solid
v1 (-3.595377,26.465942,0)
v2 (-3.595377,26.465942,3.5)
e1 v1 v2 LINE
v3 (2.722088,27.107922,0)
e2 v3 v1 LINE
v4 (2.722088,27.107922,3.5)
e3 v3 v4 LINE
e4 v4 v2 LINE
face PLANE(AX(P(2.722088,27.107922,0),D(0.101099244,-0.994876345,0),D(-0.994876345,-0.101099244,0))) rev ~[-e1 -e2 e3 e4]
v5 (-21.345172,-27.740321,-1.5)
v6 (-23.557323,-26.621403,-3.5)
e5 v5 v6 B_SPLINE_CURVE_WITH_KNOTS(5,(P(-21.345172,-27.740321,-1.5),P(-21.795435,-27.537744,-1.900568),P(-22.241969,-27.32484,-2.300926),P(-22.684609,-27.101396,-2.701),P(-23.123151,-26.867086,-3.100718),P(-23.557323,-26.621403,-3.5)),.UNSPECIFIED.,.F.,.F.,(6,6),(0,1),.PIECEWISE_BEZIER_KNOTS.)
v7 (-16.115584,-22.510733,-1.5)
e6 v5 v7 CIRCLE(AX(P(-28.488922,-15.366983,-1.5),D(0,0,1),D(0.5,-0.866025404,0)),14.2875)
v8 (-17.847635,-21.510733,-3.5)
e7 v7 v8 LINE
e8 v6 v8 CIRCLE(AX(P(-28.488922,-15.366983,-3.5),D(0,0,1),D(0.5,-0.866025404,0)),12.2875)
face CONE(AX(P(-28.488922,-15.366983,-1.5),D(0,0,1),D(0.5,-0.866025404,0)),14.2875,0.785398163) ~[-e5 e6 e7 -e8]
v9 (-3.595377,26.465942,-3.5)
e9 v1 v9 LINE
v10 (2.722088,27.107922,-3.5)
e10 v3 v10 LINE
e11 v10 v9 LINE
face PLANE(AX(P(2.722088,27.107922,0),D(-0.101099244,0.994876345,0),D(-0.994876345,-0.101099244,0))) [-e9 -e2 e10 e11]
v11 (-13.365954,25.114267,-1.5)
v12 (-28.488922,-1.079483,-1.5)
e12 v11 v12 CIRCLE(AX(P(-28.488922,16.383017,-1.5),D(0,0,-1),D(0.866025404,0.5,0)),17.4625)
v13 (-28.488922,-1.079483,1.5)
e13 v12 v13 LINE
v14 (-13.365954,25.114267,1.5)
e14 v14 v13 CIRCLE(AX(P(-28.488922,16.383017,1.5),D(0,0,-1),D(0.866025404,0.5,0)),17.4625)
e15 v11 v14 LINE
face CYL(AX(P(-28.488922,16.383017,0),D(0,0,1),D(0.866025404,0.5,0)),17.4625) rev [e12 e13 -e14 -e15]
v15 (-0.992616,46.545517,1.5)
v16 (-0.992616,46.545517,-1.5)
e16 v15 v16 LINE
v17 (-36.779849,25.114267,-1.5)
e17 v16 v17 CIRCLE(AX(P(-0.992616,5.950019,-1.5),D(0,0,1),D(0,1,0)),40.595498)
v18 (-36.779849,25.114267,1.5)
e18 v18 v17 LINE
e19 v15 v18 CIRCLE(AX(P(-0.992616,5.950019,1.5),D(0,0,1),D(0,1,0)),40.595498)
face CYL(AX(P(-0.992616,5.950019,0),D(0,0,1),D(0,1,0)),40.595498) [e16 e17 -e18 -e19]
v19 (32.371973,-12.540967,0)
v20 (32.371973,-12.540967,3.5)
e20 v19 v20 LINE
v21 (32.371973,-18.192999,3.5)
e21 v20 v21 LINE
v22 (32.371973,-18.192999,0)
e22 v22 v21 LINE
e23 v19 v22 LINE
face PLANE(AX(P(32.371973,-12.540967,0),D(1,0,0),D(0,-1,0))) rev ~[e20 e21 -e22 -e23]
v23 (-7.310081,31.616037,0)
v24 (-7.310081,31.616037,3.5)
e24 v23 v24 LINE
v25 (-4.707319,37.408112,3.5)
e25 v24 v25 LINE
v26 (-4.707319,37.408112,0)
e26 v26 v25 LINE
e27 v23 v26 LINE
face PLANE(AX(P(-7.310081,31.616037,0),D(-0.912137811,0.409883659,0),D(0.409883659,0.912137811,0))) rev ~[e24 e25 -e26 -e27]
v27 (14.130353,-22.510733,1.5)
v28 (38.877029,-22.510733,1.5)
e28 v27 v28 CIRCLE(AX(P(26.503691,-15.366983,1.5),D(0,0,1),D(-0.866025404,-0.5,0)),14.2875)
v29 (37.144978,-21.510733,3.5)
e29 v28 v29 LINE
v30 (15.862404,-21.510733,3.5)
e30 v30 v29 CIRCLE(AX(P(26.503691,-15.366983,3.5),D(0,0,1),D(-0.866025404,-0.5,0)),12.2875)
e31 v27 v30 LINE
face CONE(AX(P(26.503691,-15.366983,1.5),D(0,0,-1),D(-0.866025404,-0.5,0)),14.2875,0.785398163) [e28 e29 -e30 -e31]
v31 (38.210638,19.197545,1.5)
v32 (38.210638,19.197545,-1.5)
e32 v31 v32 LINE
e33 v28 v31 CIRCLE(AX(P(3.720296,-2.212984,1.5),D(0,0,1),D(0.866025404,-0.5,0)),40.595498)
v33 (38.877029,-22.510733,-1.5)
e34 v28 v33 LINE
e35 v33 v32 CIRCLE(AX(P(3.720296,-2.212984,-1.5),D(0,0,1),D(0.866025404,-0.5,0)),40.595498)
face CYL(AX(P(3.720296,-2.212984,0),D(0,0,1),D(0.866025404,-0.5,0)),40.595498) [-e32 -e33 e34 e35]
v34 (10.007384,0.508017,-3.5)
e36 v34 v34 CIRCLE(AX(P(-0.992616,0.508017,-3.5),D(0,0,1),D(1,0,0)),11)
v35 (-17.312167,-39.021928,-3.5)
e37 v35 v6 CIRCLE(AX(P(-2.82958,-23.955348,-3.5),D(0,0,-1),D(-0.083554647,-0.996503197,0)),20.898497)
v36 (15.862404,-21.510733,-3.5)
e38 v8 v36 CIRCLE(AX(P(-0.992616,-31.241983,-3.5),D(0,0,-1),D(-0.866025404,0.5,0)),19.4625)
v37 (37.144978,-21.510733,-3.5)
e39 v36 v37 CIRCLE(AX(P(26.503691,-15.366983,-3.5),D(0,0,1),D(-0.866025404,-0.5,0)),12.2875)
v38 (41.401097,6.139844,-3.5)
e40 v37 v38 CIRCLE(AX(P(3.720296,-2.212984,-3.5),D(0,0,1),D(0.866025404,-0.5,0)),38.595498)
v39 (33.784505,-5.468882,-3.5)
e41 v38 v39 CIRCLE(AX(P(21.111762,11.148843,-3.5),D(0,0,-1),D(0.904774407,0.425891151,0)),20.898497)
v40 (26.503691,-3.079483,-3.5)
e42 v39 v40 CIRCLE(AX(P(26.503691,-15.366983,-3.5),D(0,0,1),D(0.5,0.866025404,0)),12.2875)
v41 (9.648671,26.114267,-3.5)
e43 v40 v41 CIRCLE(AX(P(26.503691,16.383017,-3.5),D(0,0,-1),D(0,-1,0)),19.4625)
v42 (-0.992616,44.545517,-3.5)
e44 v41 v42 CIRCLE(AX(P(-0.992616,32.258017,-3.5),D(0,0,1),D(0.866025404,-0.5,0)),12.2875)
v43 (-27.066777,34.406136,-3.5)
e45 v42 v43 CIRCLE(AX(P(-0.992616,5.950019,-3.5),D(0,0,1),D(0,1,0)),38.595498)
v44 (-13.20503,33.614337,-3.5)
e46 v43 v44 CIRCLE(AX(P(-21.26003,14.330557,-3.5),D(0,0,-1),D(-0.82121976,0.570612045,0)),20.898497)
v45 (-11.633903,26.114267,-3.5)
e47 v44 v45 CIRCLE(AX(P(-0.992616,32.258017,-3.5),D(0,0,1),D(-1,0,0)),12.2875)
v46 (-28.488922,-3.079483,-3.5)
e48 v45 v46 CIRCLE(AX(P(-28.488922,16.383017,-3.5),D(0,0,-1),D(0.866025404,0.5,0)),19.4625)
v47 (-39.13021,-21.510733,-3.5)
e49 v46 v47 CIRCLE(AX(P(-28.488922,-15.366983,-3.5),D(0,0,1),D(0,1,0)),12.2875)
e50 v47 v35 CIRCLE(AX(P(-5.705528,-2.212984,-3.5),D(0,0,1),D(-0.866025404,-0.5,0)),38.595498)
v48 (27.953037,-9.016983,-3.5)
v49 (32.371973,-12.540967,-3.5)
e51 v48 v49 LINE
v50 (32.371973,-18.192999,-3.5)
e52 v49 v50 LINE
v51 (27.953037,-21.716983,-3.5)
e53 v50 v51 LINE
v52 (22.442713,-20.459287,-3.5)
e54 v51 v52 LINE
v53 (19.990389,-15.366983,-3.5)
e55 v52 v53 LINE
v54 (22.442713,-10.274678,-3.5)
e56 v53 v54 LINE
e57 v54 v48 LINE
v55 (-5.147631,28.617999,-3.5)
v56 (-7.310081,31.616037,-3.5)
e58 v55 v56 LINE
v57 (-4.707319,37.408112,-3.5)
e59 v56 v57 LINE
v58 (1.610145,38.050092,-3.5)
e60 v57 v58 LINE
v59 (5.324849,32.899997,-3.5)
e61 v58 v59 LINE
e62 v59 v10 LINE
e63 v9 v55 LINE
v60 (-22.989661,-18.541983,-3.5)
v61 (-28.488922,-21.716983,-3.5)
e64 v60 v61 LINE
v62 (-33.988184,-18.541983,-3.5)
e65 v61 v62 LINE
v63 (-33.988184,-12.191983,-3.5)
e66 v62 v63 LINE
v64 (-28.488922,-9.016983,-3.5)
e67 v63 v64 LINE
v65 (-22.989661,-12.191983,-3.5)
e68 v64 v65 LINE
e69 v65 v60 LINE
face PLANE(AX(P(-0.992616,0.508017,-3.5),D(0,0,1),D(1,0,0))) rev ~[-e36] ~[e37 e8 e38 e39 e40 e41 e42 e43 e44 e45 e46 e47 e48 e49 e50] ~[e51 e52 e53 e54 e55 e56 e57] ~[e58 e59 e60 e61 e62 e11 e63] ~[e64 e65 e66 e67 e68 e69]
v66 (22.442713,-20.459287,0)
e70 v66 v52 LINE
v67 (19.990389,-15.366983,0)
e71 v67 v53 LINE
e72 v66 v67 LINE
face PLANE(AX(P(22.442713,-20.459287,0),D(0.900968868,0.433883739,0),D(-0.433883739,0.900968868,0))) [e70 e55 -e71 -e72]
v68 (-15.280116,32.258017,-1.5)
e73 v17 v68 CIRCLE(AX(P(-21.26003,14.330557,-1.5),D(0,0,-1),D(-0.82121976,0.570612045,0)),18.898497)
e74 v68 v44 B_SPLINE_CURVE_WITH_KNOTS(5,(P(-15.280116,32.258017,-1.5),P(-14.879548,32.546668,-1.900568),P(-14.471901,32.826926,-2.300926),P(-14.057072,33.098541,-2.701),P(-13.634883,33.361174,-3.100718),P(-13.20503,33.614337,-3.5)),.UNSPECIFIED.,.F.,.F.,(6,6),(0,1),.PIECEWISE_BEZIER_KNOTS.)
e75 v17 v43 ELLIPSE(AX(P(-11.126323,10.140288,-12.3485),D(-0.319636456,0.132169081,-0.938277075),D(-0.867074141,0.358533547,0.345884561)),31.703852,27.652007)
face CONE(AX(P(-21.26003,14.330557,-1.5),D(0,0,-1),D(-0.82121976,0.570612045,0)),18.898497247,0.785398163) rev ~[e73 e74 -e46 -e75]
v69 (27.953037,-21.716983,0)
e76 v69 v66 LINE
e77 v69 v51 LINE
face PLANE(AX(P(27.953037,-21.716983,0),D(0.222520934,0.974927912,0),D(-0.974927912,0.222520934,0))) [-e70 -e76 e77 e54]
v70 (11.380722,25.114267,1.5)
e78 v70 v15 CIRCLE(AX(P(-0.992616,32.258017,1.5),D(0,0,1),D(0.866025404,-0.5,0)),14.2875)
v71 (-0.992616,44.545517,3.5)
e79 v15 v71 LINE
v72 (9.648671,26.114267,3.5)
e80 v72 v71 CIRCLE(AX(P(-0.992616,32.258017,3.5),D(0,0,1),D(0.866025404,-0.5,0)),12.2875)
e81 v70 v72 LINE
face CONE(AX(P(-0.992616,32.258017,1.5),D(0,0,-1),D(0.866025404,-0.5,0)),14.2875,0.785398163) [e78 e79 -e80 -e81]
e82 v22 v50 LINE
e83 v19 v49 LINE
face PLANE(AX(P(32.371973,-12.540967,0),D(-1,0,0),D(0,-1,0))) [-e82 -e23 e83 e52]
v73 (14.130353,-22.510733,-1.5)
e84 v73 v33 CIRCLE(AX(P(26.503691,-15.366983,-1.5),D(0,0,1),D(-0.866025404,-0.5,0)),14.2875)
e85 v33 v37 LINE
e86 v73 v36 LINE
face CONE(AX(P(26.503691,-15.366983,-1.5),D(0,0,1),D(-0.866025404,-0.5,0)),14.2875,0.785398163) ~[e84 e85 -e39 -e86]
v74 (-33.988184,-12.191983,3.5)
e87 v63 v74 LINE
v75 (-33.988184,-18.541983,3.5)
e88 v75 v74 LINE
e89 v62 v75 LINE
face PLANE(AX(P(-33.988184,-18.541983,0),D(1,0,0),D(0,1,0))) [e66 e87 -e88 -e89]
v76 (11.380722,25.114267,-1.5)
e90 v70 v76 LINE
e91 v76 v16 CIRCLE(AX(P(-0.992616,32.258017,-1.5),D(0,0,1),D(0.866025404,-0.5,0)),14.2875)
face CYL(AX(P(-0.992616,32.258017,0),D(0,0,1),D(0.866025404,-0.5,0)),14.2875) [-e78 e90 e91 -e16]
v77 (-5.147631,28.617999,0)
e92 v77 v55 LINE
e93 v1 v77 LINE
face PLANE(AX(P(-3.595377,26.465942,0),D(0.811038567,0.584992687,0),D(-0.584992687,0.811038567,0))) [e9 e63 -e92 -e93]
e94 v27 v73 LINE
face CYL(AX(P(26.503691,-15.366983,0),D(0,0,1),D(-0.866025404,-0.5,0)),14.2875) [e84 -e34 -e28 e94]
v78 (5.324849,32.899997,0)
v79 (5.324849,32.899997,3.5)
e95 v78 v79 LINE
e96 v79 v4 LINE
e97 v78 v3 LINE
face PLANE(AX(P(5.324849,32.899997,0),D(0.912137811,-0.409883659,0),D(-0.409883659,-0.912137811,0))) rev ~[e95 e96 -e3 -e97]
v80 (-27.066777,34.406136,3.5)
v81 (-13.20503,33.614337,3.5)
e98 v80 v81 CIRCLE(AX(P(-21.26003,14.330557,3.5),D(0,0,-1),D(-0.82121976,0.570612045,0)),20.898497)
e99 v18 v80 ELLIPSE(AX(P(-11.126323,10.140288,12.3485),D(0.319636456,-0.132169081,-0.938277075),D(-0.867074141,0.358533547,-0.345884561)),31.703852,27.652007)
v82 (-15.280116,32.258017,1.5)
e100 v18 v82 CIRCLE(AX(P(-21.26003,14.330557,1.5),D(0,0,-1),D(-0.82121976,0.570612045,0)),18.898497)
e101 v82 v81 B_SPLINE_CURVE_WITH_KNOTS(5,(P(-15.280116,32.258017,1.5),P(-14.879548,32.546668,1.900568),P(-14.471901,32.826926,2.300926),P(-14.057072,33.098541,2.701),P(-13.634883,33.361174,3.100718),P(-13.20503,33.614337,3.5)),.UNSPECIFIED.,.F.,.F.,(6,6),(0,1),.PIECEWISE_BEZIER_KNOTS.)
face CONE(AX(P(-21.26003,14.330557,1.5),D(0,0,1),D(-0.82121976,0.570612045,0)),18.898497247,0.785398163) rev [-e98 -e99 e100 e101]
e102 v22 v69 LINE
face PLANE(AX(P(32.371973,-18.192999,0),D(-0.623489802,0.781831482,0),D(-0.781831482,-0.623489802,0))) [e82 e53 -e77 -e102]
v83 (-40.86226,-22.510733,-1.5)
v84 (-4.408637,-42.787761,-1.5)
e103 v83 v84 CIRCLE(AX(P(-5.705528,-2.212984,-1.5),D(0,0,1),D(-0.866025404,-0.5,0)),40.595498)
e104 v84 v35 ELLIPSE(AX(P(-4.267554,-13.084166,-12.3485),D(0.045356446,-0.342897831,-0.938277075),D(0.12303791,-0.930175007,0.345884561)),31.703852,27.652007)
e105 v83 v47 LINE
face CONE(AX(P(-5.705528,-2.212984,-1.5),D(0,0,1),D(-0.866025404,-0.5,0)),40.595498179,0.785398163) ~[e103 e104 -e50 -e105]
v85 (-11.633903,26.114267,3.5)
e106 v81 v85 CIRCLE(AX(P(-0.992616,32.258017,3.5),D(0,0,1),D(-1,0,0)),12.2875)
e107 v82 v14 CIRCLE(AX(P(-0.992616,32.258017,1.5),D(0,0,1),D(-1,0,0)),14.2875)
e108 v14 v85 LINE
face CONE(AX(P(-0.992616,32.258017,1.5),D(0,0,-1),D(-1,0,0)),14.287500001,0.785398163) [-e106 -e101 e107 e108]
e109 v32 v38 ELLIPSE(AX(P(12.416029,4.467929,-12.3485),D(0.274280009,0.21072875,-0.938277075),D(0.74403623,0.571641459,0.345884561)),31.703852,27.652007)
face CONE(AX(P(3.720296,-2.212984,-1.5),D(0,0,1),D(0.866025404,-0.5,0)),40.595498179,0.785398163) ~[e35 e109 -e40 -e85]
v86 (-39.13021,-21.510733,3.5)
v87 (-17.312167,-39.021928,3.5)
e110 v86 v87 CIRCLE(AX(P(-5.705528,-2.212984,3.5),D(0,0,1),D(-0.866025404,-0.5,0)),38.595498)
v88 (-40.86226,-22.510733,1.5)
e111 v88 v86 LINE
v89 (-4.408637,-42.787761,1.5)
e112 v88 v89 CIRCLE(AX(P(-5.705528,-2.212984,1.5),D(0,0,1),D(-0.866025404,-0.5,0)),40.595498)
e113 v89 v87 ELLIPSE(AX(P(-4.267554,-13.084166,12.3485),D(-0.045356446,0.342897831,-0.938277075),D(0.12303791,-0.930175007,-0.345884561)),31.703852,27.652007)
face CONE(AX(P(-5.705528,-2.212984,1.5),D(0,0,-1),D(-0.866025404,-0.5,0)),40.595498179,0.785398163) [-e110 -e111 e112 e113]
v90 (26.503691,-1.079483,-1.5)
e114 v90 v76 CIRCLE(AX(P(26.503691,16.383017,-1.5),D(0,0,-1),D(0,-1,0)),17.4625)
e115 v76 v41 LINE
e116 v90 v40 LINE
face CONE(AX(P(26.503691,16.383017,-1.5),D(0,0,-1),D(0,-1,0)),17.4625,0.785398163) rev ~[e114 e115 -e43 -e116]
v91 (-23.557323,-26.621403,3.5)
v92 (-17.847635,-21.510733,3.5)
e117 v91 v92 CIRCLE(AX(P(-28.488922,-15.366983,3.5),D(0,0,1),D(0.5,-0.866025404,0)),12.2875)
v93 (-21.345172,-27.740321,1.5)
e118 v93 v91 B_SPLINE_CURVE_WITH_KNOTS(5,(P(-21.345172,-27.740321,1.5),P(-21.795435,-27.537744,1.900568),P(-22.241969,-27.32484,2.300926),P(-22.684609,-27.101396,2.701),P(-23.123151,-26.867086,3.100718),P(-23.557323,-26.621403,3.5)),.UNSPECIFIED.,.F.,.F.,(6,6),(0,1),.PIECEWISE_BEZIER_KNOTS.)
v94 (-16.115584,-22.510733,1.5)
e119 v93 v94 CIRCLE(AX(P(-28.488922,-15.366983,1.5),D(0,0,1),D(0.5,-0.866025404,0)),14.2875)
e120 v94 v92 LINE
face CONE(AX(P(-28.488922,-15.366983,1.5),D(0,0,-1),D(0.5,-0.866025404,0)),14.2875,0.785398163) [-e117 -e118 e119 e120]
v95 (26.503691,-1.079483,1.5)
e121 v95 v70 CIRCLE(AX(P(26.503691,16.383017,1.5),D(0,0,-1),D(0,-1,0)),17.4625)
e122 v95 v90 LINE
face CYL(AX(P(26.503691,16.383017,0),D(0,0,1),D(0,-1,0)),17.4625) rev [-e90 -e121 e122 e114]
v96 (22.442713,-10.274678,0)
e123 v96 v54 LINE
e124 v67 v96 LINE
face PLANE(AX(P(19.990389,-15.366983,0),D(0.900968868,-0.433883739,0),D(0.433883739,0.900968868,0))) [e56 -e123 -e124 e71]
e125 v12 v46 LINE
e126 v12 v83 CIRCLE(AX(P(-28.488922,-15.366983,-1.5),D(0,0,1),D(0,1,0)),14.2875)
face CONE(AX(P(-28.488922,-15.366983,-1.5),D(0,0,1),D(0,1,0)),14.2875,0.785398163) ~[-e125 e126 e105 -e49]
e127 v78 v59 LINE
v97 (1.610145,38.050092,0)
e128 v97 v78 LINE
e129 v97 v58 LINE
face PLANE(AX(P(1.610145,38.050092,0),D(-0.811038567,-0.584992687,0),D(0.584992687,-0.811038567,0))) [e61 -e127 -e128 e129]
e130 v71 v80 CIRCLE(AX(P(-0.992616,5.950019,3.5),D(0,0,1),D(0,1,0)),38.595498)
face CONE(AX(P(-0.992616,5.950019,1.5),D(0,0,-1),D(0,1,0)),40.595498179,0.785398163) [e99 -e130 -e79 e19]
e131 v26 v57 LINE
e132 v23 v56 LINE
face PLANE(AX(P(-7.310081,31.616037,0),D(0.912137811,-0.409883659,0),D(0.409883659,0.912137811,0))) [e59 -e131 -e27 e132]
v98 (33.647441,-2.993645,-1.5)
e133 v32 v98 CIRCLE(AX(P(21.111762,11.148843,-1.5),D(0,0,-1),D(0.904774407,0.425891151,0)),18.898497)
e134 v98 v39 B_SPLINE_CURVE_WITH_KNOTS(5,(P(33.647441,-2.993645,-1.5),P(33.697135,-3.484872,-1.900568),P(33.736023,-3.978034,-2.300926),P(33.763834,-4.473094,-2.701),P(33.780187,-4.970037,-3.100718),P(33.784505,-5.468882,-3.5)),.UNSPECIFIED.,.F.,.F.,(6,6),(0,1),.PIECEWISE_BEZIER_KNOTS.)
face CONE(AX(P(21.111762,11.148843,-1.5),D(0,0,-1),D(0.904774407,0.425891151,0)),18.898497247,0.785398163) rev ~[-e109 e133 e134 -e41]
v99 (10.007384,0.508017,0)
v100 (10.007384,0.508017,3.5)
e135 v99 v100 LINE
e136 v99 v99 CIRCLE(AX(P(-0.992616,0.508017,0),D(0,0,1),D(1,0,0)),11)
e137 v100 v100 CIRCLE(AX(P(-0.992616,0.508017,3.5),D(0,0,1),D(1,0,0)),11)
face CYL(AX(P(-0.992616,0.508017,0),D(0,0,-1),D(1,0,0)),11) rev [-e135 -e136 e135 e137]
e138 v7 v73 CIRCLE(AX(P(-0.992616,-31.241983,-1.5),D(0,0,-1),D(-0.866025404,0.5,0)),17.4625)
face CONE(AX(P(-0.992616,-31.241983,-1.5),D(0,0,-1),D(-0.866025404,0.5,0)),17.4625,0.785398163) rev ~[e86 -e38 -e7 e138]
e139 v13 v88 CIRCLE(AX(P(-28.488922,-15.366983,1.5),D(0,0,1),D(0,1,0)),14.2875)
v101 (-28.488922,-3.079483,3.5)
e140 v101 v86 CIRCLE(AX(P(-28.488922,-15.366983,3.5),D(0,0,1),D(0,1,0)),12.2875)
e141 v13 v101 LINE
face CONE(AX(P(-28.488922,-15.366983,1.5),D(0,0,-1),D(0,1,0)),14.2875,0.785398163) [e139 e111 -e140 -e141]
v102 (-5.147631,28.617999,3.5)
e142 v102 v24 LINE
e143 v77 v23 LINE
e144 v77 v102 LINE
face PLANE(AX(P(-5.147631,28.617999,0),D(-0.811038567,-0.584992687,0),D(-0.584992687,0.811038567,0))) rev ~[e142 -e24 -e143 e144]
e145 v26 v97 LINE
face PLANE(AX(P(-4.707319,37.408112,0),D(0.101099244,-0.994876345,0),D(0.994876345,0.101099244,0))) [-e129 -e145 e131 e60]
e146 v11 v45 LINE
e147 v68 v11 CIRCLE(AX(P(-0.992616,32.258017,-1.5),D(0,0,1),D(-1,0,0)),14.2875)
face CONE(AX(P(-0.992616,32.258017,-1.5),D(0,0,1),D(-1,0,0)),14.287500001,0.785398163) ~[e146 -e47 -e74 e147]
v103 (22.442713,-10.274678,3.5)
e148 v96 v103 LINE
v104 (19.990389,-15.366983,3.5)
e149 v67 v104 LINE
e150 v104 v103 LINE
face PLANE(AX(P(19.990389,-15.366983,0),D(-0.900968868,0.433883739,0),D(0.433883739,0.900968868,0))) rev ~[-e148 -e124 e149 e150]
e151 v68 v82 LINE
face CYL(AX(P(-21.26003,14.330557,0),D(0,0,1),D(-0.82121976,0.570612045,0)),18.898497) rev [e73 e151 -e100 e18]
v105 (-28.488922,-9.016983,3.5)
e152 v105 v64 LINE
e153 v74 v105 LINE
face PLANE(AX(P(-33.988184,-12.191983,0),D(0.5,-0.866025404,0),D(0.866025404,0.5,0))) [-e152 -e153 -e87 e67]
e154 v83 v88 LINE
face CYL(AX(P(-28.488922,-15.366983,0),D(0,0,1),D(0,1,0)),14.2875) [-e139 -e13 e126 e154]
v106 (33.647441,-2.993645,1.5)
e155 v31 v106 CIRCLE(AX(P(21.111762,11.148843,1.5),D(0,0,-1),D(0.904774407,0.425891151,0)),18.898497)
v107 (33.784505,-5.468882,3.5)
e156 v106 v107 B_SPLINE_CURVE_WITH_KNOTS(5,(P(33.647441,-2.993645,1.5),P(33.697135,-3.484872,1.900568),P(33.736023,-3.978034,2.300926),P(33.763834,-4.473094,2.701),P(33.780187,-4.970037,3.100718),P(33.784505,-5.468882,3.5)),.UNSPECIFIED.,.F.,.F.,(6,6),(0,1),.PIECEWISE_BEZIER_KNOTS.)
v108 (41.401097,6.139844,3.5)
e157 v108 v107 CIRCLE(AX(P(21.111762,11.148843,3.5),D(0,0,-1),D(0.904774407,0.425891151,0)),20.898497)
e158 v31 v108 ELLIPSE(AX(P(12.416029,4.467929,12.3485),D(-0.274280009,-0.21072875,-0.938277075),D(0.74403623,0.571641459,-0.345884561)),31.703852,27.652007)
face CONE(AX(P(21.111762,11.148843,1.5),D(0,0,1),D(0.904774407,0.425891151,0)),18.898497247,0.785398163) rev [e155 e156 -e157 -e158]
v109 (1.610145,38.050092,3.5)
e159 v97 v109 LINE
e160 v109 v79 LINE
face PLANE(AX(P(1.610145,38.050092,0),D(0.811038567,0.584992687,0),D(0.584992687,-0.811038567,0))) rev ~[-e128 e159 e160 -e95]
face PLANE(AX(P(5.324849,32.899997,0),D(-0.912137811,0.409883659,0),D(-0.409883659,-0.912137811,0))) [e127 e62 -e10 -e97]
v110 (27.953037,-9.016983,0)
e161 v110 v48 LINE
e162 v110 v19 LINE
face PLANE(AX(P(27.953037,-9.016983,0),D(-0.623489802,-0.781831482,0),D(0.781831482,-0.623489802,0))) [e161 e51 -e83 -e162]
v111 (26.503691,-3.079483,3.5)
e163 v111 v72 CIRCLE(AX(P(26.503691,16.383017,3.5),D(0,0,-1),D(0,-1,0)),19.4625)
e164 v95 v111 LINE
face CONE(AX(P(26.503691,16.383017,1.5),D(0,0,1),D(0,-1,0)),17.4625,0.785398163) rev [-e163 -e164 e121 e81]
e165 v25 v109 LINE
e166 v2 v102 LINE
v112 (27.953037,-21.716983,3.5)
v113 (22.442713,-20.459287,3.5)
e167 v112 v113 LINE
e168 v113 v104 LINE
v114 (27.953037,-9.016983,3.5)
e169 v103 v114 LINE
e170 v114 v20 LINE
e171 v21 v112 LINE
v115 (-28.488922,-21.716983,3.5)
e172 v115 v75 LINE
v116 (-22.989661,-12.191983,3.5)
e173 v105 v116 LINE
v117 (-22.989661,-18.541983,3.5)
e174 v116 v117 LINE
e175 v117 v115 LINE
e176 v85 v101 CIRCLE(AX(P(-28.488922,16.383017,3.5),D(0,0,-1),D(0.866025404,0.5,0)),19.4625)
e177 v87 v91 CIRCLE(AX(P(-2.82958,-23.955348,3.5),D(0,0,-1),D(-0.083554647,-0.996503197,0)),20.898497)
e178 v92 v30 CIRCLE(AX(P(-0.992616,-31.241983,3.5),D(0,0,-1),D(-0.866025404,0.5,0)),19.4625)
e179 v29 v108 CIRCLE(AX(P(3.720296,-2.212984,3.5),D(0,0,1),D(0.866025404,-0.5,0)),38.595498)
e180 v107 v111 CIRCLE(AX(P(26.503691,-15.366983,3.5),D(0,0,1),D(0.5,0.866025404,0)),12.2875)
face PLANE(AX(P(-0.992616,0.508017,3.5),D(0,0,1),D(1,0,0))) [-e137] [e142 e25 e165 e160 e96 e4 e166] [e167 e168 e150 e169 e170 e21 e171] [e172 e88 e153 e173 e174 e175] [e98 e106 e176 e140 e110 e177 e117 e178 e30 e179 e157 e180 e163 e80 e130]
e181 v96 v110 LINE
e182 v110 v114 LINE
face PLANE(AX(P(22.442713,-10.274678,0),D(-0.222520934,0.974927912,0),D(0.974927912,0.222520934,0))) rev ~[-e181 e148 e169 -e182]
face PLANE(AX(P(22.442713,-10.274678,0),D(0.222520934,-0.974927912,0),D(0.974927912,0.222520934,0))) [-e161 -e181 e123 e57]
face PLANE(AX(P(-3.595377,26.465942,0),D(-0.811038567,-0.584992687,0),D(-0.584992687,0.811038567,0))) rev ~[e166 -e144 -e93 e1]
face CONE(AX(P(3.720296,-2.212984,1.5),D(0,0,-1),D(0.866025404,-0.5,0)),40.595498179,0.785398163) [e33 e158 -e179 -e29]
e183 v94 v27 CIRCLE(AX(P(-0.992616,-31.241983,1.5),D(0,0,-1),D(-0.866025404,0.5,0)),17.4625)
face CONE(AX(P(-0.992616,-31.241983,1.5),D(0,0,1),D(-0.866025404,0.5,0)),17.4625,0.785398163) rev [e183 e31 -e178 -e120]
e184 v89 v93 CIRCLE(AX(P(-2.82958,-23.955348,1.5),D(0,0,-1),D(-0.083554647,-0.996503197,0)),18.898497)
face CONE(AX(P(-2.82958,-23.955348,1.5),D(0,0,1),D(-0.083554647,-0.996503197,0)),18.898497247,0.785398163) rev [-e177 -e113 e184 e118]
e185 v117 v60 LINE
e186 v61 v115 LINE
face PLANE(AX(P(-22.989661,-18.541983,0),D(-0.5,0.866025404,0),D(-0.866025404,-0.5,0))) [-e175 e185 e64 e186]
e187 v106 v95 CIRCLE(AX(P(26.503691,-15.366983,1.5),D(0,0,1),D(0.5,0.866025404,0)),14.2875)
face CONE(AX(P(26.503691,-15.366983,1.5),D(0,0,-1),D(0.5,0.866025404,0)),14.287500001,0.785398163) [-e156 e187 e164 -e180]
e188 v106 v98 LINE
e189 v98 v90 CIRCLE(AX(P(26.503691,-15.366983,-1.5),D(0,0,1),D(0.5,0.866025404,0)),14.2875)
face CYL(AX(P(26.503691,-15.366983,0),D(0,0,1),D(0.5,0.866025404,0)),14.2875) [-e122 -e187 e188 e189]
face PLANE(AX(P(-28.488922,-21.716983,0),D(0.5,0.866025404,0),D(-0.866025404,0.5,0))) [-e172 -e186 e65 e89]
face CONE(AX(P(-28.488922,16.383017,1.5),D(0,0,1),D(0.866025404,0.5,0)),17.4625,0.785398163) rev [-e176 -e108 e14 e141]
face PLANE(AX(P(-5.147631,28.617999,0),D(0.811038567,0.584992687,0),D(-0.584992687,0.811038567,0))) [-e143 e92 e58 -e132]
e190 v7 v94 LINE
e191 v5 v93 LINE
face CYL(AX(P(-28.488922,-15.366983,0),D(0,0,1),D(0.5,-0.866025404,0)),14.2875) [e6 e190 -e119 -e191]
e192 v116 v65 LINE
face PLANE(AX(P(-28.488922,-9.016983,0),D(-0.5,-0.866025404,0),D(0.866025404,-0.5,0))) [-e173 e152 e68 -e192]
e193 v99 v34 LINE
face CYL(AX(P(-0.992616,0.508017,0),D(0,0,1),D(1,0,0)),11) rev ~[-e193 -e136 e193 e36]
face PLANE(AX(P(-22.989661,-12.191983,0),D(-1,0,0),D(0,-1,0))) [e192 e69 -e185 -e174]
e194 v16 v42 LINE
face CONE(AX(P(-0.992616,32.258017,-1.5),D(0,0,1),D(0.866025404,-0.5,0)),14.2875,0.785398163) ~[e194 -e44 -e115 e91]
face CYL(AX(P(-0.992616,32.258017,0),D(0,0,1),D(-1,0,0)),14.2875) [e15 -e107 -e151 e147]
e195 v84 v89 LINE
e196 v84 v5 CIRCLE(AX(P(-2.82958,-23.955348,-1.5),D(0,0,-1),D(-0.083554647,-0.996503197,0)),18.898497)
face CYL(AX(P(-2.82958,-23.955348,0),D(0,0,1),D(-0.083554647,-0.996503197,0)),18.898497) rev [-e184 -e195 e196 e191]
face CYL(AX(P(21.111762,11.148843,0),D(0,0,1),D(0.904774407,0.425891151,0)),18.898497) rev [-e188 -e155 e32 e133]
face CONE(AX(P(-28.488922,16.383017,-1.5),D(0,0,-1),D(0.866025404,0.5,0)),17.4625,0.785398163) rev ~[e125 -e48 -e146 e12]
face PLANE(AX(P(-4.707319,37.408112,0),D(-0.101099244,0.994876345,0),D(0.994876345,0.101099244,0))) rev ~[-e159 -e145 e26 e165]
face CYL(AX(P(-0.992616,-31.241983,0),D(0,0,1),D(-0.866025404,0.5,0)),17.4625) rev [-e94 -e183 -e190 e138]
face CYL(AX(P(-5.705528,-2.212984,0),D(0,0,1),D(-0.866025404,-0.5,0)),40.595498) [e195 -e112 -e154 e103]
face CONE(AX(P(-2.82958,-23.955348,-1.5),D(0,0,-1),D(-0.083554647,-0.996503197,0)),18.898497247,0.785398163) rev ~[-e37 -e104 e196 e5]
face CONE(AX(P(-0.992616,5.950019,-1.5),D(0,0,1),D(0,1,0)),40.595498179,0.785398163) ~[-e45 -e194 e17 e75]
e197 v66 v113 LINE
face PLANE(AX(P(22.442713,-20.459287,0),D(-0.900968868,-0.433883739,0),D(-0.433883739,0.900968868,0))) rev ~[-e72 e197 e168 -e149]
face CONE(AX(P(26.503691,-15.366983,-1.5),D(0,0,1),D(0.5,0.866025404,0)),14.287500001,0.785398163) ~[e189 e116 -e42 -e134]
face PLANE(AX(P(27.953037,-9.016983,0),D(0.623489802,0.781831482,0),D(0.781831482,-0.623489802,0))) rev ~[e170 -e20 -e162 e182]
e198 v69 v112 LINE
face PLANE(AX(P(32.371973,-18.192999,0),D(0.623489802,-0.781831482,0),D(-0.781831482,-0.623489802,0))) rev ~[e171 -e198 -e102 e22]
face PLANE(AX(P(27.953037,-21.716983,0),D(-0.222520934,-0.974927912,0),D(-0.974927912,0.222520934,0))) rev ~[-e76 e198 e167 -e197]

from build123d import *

# Parameters (mm, degrees)
F0_R          = 11
F1_DEPTH      = 3.5
F1_DEPTH_BACK = 3.5
F2_SIZE       = 2


# Not quite as in the source:
# - a feature names something its author has since deleted; it is built from what else it names


with BuildPart() as f1:
    # F0 (on Top) → F1 (new body, two sides)
    with BuildSketch(Plane.XY) as f1_sk:
        with BuildLine():
            ThreePointArc((-36.7798490863, 25.1142671396), (-27.219118588, 32.264950132), (-15.2801158302, 32.2580171396))
            ThreePointArc((-15.2801158302, 32.2580171396), (-14.7932810733, 28.5601400327), (-13.3659537868, 25.1142671396))
            ThreePointArc((-13.3659537868, 25.1142671396), (-13.3659537868, 7.6517671396), (-28.4889224003, -1.0794828604))
            ThreePointArc((-28.4889224003, -1.0794828604), (-40.8622603569, -8.2232328604), (-40.8622603569, -22.5107328604))
            ThreePointArc((-40.8622603569, -22.5107328604), (-25.4390445698, -37.6894940637), (-4.408636794, -42.7877609913))
            ThreePointArc((-4.408636794, -42.7877609913), (-15.3816751689, -38.0832669973), (-21.3451724003, -27.740320817))
            ThreePointArc((-21.3451724003, -27.740320817), (-18.3861342641, -25.4697709966), (-16.1155844438, -22.5107328604))
            ThreePointArc((-16.1155844438, -22.5107328604), (-0.9926158302, -13.7794828604), (14.1303527834, -22.5107328604))
            ThreePointArc((14.1303527834, -22.5107328604), (26.50369074, -29.6544828604), (38.8770286965, -22.5107328604))
            ThreePointArc((38.8770286965, -22.5107328604), (44.310613603, -1.5644555791), (38.2106383897, 19.1975452705))
            ThreePointArc((38.2106383897, 19.1975452705), (39.6229462664, 7.3423682841), (33.64744074, -2.9936449038))
            ThreePointArc((33.64744074, -2.9936449038), (30.2015678469, -1.5663176173), (26.50369074, -1.0794828604))
            ThreePointArc((26.50369074, -1.0794828604), (11.3807221264, 7.6517671396), (11.3807221264, 25.1142671396))
            ThreePointArc((11.3807221264, 25.1142671396), (11.3807221264, 39.4017671396), (-0.9926158302, 46.5455171396))
            ThreePointArc((-0.9926158302, 46.5455171396), (-21.8494165238, 40.7780010616), (-36.7798490863, 25.1142671396))
        make_face()
        Polygon((-28.4889224003, -21.7169828604), (-33.9881837144, -18.5419828604), (-33.9881837144, -12.1919828604), (-28.4889224003, -9.0169828604), (-22.9896610863, -12.1919828604), (-22.9896610863, -18.5419828604), align=None, mode=Mode.SUBTRACT)
        with Locations((-0.9926158302, 0.5080171396)):
            Circle(F0_R, mode=Mode.SUBTRACT)
        Polygon((27.9530368024, -9.0169828604), (32.3719731429, -12.5409669992), (32.3719731429, -18.1929987216), (27.9530368024, -21.7169828604), (22.4427133156, -20.4592874828), (19.9903886582, -15.3669828604), (22.4427133156, -10.274678238), align=None, mode=Mode.SUBTRACT)
        Polygon((5.3248489637, 32.8999973403), (2.7220877293, 27.1079222409), (-3.5953770646, 26.4659420402), (-5.1476309604, 28.6179993288), (-7.3100806241, 31.6160369389), (-4.7073193896, 37.4081120383), (1.6101454042, 38.050092239), align=None, mode=Mode.SUBTRACT)
    extrude(amount=F1_DEPTH)
    extrude(f1_sk.sketch, amount=-F1_DEPTH_BACK)

    # F2
    f2_edges = [f1.edges().sort_by_distance(p)[0] for p in [
        (-25.439045, -37.689494, 3.5),
        (-25.439045, -37.689494, -3.5),
        (-21.849417, 40.778001, -3.5),
        (-21.849417, 40.778001, 3.5),
        (26.503691, -29.654483, -3.5),
        (26.503691, -29.654483, 3.5),
        (-27.219119, 32.26495, 3.5),
        (39.622946, 7.342368, -3.5),
        (39.622946, 7.342368, 3.5),
        (-27.219119, 32.26495, -3.5),
        (-15.381675, -38.083267, -3.5),
        (-15.381675, -38.083267, 3.5),
    ]]
    chamfer(f2_edges, length=F2_SIZE)


solid = f1.part
